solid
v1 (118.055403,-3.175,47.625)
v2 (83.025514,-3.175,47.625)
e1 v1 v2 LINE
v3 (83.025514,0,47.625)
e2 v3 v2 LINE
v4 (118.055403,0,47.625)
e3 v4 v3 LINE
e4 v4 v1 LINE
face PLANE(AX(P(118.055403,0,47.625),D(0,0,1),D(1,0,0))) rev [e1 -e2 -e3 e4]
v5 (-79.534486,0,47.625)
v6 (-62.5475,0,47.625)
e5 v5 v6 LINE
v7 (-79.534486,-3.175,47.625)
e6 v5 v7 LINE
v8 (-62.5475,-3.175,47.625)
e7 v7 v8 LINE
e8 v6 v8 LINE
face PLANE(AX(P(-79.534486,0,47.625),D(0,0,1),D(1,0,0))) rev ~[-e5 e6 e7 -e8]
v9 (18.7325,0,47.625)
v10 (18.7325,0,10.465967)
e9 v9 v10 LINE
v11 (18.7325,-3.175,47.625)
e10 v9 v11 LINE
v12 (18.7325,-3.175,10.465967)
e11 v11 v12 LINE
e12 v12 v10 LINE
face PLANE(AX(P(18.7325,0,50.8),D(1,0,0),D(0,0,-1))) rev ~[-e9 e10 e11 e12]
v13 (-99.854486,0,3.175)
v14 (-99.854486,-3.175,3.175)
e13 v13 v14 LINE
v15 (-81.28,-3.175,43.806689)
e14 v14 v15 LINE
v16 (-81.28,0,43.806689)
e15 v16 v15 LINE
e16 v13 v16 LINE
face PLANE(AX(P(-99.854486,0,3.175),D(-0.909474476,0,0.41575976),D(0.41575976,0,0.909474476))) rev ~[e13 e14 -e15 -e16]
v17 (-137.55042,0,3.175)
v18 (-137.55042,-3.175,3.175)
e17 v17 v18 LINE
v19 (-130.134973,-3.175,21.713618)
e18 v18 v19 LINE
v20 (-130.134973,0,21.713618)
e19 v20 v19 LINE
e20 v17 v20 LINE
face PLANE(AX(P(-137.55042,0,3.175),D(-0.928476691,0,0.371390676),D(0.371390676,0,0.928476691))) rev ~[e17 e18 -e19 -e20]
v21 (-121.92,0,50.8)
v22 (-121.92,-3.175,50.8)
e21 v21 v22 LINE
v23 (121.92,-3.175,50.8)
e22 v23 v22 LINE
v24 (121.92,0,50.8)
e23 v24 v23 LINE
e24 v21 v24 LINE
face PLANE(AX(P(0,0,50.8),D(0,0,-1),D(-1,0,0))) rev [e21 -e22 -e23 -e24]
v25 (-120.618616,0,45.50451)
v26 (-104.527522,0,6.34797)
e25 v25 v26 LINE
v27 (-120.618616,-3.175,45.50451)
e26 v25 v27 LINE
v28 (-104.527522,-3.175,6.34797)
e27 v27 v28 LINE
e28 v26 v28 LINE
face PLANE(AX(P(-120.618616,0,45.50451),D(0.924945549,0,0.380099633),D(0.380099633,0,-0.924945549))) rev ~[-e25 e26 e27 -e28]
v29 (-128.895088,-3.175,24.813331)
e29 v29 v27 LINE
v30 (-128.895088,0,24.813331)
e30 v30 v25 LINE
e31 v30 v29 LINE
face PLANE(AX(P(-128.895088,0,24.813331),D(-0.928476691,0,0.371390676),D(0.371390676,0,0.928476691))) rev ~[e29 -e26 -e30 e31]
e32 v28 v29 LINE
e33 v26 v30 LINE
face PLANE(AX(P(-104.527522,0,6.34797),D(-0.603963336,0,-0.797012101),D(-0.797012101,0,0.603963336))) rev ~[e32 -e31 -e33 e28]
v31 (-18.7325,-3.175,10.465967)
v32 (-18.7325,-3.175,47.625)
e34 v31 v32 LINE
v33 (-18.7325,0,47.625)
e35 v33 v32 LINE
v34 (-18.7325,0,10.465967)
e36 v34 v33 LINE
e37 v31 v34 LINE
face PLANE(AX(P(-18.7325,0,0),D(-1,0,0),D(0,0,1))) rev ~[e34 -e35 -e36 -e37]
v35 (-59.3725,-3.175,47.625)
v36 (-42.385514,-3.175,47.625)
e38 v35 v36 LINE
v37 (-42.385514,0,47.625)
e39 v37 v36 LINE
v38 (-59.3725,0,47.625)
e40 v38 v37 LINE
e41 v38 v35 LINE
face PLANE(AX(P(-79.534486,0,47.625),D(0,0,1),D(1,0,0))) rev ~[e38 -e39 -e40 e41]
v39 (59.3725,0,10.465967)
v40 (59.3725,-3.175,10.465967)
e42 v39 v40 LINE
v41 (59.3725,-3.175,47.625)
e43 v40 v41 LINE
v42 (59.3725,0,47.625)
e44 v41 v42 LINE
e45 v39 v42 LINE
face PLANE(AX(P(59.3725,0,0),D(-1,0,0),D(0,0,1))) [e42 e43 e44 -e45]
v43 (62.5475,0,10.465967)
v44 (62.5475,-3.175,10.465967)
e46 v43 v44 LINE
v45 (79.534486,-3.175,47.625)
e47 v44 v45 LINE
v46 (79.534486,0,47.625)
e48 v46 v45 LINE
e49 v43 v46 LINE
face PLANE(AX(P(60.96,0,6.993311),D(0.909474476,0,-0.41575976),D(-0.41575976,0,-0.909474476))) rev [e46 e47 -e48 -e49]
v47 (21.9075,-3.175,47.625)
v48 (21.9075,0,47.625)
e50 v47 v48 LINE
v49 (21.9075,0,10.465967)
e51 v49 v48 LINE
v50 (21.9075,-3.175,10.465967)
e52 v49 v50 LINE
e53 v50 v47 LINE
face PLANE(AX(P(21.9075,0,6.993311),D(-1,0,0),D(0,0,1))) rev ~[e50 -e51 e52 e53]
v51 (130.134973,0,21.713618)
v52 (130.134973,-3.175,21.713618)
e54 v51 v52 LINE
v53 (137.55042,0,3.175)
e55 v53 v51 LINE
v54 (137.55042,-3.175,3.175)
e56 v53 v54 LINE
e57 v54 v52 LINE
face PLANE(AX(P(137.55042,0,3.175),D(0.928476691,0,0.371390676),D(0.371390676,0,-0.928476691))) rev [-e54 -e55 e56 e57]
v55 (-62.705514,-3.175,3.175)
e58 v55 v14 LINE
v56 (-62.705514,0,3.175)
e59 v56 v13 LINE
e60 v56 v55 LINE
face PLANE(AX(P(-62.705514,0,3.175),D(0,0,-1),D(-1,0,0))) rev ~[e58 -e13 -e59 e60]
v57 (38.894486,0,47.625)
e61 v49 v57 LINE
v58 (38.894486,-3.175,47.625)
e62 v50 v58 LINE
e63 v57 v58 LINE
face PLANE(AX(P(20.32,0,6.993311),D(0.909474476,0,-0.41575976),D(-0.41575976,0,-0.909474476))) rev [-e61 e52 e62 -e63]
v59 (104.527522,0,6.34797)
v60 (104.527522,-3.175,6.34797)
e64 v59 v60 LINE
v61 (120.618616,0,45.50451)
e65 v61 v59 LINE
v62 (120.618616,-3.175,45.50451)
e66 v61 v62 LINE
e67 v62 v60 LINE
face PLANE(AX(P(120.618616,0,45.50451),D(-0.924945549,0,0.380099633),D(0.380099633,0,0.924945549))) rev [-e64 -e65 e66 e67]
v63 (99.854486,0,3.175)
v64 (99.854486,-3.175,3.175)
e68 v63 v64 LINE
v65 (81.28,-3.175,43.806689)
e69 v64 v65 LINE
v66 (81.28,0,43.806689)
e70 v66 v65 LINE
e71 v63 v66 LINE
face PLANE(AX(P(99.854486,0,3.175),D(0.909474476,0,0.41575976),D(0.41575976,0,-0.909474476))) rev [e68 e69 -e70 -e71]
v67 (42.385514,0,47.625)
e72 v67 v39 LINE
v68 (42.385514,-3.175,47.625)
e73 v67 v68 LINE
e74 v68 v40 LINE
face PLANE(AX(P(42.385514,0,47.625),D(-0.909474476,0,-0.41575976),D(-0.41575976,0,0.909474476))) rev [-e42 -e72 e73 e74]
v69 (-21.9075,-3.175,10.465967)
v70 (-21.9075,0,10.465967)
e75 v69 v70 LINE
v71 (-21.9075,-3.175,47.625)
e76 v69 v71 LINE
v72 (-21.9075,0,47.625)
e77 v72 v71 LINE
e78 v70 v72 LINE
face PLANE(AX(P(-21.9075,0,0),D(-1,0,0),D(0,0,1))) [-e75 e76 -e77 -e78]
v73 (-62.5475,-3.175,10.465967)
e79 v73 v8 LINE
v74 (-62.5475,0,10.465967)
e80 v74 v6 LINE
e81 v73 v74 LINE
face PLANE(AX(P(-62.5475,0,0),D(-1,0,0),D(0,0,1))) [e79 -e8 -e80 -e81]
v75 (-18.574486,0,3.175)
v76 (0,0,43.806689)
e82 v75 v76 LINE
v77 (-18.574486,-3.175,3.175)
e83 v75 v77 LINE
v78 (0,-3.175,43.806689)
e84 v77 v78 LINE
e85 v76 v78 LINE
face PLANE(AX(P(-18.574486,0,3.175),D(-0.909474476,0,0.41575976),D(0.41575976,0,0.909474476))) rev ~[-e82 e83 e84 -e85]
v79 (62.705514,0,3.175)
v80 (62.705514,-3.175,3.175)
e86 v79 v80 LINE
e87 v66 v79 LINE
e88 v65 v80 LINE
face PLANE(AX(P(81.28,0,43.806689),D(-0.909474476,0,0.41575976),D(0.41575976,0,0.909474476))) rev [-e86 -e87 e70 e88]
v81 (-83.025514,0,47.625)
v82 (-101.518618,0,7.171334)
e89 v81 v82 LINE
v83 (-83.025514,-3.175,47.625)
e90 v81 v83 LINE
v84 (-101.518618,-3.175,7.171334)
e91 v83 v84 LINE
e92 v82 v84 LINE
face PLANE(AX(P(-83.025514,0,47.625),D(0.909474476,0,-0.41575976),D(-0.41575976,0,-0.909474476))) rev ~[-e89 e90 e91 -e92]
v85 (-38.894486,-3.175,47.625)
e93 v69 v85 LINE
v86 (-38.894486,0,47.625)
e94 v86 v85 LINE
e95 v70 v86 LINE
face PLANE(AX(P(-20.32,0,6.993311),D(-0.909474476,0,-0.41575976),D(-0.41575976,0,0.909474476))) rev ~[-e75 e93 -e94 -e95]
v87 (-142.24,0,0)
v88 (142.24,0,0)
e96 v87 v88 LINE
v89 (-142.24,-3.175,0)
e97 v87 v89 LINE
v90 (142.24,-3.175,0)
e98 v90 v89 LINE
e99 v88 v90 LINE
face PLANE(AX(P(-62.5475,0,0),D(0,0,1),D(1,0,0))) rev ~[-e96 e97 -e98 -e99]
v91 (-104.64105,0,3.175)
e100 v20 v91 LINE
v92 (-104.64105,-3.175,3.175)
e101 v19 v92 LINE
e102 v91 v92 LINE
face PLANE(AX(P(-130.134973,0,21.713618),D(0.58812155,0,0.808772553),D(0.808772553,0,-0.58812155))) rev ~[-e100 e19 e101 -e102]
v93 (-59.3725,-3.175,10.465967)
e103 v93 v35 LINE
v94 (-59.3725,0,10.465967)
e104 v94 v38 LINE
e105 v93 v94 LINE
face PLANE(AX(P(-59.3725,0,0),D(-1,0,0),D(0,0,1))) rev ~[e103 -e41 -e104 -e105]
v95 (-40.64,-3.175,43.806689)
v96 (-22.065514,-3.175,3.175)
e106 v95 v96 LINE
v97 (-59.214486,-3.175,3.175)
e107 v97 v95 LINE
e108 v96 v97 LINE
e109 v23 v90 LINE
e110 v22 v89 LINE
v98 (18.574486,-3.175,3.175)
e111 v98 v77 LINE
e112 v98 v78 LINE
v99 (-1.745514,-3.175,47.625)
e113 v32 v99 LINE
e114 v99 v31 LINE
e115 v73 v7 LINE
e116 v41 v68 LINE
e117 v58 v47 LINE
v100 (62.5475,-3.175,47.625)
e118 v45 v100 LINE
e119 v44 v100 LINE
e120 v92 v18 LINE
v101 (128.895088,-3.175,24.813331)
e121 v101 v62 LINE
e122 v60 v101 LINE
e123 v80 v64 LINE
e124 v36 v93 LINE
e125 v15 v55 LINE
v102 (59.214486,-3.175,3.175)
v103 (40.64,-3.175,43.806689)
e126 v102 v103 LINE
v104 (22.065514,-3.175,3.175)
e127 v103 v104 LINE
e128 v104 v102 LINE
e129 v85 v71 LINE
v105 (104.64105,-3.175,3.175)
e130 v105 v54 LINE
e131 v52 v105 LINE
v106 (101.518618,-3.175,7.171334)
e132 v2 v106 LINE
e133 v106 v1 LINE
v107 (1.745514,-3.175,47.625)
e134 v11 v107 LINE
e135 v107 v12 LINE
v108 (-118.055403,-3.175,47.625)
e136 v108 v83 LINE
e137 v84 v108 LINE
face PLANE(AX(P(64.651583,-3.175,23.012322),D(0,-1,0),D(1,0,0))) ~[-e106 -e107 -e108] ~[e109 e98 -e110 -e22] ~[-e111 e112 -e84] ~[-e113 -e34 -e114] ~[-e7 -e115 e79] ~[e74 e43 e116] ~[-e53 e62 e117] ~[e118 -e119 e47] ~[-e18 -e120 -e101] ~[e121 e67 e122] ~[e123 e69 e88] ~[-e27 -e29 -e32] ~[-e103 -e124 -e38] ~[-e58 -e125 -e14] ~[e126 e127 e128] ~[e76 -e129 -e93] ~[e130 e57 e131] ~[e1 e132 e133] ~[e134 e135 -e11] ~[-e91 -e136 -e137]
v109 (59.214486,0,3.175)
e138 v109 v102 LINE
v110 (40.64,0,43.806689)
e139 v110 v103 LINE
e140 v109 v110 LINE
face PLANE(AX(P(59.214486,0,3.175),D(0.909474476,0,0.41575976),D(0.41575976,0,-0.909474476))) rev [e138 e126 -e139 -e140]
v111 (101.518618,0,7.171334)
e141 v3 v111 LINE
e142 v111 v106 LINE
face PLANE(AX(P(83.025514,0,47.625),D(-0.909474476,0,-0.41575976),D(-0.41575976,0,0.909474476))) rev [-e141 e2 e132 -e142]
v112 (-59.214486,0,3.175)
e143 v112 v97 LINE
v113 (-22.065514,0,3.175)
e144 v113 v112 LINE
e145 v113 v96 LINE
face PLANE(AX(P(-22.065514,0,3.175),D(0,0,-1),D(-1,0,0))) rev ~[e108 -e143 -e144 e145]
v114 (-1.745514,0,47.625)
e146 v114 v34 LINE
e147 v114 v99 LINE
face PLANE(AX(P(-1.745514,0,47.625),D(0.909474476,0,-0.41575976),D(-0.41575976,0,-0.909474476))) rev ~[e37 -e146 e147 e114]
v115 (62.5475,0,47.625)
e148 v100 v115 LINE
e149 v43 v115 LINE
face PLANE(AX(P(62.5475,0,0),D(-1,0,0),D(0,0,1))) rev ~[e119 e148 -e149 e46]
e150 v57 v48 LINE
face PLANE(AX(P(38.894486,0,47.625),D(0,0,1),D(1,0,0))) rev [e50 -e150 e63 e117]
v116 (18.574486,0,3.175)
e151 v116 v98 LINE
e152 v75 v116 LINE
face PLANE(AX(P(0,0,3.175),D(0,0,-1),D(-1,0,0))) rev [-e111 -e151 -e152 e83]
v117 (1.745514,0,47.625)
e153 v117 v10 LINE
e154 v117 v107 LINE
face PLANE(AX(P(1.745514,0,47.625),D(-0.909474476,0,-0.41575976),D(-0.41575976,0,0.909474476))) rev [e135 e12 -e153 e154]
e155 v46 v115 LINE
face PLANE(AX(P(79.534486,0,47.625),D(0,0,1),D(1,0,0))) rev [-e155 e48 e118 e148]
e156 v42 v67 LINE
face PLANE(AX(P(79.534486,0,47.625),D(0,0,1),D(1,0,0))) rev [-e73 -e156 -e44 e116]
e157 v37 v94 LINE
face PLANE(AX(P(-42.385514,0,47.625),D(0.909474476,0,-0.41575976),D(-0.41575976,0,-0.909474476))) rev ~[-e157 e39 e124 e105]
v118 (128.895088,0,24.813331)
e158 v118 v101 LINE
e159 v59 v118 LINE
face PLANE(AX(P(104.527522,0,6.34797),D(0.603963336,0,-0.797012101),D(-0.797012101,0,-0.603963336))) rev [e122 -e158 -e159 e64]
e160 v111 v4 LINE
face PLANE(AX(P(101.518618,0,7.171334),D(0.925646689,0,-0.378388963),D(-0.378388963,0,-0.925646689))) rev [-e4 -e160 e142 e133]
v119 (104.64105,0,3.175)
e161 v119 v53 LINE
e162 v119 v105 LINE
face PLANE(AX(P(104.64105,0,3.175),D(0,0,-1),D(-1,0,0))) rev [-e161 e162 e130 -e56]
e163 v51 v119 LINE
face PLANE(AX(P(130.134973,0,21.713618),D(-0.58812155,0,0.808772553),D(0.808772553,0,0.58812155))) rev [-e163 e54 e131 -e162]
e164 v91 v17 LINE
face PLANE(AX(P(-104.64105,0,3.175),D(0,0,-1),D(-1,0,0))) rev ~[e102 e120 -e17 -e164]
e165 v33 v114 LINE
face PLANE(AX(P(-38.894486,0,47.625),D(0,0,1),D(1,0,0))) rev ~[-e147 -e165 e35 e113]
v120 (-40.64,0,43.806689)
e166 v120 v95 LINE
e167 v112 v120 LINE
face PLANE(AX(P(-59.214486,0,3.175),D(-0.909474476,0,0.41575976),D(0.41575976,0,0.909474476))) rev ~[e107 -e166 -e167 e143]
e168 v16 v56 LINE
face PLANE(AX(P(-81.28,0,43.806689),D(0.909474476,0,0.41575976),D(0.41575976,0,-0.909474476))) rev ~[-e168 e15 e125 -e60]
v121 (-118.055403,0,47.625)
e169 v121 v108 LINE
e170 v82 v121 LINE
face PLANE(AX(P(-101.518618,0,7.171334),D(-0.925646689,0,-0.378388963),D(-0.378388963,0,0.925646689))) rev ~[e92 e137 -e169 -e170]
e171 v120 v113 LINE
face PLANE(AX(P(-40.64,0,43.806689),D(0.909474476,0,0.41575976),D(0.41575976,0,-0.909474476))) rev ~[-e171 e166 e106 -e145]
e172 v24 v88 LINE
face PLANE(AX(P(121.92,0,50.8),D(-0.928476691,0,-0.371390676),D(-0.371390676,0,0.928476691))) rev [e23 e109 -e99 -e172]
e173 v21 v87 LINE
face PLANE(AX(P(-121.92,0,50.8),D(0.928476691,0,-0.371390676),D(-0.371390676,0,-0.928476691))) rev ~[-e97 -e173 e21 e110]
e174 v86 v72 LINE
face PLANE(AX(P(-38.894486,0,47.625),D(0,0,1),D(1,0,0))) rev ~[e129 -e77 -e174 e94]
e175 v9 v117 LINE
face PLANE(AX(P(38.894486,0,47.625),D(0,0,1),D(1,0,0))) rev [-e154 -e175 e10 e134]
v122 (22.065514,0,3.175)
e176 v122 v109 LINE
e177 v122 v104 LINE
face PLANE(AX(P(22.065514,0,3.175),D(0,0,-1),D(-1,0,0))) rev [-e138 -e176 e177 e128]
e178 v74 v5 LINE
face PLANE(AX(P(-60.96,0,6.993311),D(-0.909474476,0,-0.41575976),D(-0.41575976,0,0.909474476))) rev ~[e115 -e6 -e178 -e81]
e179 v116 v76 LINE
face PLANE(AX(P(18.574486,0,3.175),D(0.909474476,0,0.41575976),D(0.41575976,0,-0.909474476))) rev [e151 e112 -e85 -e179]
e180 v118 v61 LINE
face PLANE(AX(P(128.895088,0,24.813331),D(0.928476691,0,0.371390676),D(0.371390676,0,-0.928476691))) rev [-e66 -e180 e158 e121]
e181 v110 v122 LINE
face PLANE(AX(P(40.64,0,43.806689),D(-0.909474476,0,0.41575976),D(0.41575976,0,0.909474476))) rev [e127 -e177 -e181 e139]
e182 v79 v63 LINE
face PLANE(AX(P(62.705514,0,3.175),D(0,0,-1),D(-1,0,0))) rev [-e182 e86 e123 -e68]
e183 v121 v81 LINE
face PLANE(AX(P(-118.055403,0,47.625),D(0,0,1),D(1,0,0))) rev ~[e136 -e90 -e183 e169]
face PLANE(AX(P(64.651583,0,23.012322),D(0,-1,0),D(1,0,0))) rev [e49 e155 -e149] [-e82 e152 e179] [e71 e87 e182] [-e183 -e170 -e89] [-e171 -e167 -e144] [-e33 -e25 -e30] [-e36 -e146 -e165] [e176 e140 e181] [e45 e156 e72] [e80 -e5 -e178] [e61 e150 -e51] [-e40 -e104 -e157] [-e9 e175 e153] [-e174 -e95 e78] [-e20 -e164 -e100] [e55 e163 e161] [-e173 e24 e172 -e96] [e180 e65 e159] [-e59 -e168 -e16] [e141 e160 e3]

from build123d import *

# Parameters (mm, degrees)
F1_DEPTH = 3.175
F3_W     = 3.175
F3_H     = 50.8
F4_DEPTH = 3.175
F6_DEPTH = 3.175


# Not quite as in the source:
# - a length typed as a fraction of an inch, garbled in the dataset ("3 / 203.2 mm" for 3/8 in), is restored


with BuildPart() as f1:
    # F0 (on Front) → F1 (new body)
    with BuildSketch(Plane.XZ):
        Polygon((-100.2748559753, 0), (0, 0), (0, 3.175), (-18.5744864726, 3.175), (0, 43.8066891587), (0, 47.625), (0, 50.8), (-121.92, 50.8), (-132.0796890642, 25.4007773395), (-140.97, 3.175), (-142.24, 0), align=None)
        Polygon((-104.6410501003, 3.175), (-137.5504203475, 3.175), (-130.1349730994, 21.7136181201), align=None, mode=Mode.SUBTRACT)
        Polygon((-62.7055135274, 3.175), (-99.8544864726, 3.175), (-81.28, 43.8066891587), align=None, mode=Mode.SUBTRACT)
        Polygon((-40.64, 43.8066891587), (-22.0655135274, 3.175), (-59.2144864726, 3.175), align=None, mode=Mode.SUBTRACT)
        Polygon((-128.8950878765, 24.8133311775), (-120.6186164373, 45.5045097755), (-104.527521639, 6.3479696325), align=None, mode=Mode.SUBTRACT)
        Polygon((-101.5186177981, 7.1713344078), (-118.0554031391, 47.625), (-83.0255135274, 47.625), align=None, mode=Mode.SUBTRACT)
        Polygon((-60.96, 6.9933108413), (-79.5344864726, 47.625), (-42.3855135274, 47.625), align=None, mode=Mode.SUBTRACT)
        Polygon((-38.8944864726, 47.625), (-1.7455135274, 47.625), (-20.32, 6.9933108413), align=None, mode=Mode.SUBTRACT)
    extrude(amount=F1_DEPTH)

    # F2: F1 across face


with BuildPart() as f1_1:
    add(f1.part)
    add(f1.part.mirror(Plane(origin=(0, -1.5875, 47.3033445794), x_dir=(0, 1, 0), z_dir=(1, 0, 0))))

    # F3 (on Front) → F4 (join)
    with BuildSketch(Plane.XZ):
        with Locations((-60.96, 25.4)):
            Rectangle(F3_W, F3_H)
        with Locations((-20.32, 25.4)):
            Rectangle(F3_W, F3_H)
        with Locations((60.96, 25.4)):
            Rectangle(F3_W, F3_H)
        Polygon((22.0655135274, 0), (21.9075, 6.9933108413), (21.9075, 50.8), (18.7325, 50.8), (18.7325, 0), align=None)
    extrude(amount=F4_DEPTH)


with BuildPart() as f6:
    # F5 (on Front) → F6 (new body)
    with BuildSketch(Plane.XZ):
        Polygon((14.0807485003, -20.7951998672), (-43.0692514997, -20.7951998672), (-43.0692514997, -23.9701998672), (-39.8942514997, -23.9701998672), (-39.8942514997, -27.1451998672), (10.9057485003, -27.1451998672), (10.9057485003, -23.9701998672), (14.0807485003, -23.9701998672), align=None)
    extrude(amount=F6_DEPTH)


solid = f1_1.part
